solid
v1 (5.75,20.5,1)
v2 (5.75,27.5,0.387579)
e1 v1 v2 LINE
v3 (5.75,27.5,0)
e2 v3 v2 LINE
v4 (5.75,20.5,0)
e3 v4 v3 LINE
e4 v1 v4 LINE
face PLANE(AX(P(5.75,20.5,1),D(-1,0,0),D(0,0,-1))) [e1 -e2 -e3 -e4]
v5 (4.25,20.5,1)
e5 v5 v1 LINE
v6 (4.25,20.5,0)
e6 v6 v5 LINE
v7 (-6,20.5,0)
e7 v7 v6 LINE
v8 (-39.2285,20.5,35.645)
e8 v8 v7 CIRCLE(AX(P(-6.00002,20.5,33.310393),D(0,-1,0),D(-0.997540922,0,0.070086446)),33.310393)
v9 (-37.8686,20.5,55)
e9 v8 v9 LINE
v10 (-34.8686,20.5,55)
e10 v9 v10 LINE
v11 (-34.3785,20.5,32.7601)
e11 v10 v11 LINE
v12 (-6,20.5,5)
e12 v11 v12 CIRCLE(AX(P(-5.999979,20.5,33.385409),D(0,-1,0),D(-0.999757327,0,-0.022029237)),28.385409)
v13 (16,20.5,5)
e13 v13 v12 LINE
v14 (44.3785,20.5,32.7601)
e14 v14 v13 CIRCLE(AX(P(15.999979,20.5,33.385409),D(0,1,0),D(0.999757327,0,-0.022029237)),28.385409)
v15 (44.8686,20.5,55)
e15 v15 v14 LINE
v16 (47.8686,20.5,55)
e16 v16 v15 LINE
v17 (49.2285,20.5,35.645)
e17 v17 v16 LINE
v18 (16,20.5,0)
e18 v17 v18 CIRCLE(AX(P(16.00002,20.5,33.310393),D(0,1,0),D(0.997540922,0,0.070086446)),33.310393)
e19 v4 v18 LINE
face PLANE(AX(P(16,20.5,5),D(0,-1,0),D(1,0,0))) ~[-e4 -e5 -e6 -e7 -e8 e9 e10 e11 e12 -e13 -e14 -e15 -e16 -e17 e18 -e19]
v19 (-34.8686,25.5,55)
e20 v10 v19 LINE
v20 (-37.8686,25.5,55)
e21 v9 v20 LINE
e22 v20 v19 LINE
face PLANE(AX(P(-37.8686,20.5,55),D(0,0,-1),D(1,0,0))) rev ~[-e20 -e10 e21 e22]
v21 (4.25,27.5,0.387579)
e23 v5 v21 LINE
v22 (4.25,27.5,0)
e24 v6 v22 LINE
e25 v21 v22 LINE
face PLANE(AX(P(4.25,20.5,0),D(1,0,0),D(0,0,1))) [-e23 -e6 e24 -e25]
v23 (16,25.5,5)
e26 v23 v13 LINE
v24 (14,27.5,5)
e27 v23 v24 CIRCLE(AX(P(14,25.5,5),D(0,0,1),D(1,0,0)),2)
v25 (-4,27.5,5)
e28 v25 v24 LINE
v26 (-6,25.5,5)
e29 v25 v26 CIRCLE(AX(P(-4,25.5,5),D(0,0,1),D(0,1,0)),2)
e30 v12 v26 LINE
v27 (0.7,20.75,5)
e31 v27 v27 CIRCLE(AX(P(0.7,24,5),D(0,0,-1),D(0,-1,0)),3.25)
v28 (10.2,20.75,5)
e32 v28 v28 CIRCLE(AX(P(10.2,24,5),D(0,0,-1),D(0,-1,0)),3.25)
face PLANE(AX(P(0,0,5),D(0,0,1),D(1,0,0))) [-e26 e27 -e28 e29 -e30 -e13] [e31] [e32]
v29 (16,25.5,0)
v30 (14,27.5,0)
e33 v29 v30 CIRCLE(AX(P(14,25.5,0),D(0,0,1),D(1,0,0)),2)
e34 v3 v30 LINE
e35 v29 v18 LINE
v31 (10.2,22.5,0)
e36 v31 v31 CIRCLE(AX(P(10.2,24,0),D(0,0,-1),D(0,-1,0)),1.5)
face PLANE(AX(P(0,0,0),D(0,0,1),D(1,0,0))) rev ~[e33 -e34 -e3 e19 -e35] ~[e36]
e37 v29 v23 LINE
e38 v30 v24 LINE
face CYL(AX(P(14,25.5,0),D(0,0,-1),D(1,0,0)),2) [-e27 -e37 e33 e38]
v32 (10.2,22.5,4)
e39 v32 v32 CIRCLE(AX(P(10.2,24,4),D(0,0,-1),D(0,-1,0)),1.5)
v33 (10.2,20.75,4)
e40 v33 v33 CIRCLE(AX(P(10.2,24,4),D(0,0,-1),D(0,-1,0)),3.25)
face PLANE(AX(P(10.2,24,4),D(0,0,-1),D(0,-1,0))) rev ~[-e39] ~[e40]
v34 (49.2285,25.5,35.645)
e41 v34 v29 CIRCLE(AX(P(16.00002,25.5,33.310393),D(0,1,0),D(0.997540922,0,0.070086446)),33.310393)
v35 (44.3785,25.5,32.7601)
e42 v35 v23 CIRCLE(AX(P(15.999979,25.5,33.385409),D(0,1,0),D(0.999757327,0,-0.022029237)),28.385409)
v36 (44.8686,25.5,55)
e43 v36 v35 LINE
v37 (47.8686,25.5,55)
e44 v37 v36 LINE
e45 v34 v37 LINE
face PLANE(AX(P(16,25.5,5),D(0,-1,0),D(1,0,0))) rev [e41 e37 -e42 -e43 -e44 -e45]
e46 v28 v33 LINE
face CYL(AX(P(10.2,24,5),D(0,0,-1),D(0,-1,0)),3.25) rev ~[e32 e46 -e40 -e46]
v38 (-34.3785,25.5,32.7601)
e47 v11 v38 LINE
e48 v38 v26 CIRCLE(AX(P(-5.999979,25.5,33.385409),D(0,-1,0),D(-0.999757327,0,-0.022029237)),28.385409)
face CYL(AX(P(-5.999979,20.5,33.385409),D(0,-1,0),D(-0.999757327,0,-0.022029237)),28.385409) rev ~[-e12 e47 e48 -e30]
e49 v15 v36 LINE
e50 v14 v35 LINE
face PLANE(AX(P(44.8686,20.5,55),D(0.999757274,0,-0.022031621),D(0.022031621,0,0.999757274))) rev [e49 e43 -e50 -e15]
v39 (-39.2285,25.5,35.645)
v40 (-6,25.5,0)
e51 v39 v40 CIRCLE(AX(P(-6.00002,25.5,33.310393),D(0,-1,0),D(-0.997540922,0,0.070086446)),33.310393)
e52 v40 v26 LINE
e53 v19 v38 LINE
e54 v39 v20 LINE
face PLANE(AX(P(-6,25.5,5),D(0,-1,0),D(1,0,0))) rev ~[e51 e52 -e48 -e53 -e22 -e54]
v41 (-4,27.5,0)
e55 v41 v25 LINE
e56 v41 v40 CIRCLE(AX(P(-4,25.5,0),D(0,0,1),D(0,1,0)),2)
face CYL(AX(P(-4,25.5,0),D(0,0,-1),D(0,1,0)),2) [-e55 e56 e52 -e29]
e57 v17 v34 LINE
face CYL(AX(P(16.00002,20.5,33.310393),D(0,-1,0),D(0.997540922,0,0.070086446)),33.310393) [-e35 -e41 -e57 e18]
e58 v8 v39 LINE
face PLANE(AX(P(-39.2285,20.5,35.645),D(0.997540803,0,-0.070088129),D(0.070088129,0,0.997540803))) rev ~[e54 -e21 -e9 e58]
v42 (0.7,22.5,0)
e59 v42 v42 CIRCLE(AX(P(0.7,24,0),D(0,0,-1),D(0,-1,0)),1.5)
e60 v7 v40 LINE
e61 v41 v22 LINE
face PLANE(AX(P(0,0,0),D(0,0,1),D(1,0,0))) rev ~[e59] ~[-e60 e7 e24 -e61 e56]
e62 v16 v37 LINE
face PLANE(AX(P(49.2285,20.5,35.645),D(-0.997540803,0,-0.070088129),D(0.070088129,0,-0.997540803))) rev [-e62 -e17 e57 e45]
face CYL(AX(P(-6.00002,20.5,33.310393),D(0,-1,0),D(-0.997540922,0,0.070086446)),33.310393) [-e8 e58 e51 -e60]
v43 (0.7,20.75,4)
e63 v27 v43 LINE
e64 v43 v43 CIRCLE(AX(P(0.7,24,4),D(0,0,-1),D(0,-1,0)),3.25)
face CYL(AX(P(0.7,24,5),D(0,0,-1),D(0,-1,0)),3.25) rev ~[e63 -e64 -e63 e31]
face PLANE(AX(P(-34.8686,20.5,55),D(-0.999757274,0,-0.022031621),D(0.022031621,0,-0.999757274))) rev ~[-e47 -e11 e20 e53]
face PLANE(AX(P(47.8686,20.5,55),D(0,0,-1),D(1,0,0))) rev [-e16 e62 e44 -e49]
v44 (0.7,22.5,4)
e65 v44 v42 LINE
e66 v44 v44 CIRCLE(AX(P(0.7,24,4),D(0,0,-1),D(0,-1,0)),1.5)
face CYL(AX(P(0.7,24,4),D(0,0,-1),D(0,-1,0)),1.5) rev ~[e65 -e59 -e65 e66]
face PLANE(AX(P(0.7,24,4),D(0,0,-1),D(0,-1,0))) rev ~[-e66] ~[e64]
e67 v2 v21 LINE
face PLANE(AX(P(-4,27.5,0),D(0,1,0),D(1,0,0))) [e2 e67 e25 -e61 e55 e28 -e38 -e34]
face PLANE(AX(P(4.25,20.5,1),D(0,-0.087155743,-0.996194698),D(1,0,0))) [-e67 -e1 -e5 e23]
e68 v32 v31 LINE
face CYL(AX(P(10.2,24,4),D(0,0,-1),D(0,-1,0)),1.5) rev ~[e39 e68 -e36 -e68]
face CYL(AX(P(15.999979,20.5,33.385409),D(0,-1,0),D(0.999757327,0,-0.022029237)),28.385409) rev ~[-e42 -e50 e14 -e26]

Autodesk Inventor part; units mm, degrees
ref_plane "YZ Plane" through (0, 0, 0) normal (1, 0, 0) x (0, 1, 0)
ref_plane "XZ Plane" through (0, 0, 0) normal (0, 1, 0) x (-1, 0, 0)
ref_plane "XY Plane" through (0, 0, 0) normal (0, 0, 1) x (1, 0, 0)
ref_plane "Work Plane1" through (0, 0, 0) normal (0, 0, 1) x (1, 0, 0)
sketch "Sketch1" plane through (0, 0, 0) normal (0, 0, 1) x (1, 0, 0)
  circle A0 centre (10.2273, -23.9687) radius 0.75 projected
  circle A1 centre (0.7, 24) radius 0.75 projected
  circle A2 centre (10.2, 24) radius 0.75 projected
  circle A3 centre (0.7, -24) radius 0.75 projected
  arc A4 (-14, 7) -> (-16, 5) centre (-14, 5) ccw projected
  line L0 (-16, -15) -> (-16, 5) projected
  arc A5 (-16, -15) -> (-14, -17) centre (-14, -15) ccw projected
  line L1 (-8, -17) -> (-14, -17) projected
  arc A6 (-6, -19) -> (-8, -17) centre (-8, -19) ccw projected
  line L2 (-6, -25.5) -> (-6, -19) projected
  arc A7 (-6, -25.5) -> (-4, -27.5) centre (-4, -25.5) ccw projected
  line L3 (14, -27.5) -> (-4, -27.5) projected
  arc A8 (14, -27.5) -> (16, -25.5) centre (14, -25.5) ccw projected
  line L4 (16, -20.5) -> (16, -25.5) projected
  line L5 (-4, -20.5) -> (16, -20.5) projected
  line L6 (-4, -15) -> (-4, -20.5) projected
  line L7 (-14, -15) -> (-4, -15) projected
  line L8 (-14, 5) -> (-14, -15) projected
  line L9 (-4, 5) -> (-14, 5) projected
  line L10 (-4, 20.5) -> (-4, 5) projected
  line L11 (16, 20.5) -> (-4, 20.5) projected
  line L12 (16, 25.5) -> (16, 20.5) projected
  arc A9 (16, 25.5) -> (14, 27.5) centre (14, 25.5) ccw projected
  line L13 (-4, 27.5) -> (14, 27.5) projected
  arc A10 (-4, 27.5) -> (-6, 25.5) centre (-4, 25.5) ccw projected
  line L14 (-6, 9) -> (-6, 25.5) projected
  arc A11 (-8, 7) -> (-6, 9) centre (-8, 9) ccw projected
  line L15 (-14, 7) -> (-8, 7) projected
  line L16 (-4, 20.5) -> (-6, 20.5)
  point P0 (0, 0)
extrude "Extrusion1" add sketch "Sketch1" along normal blind 5 contours L14 A10 L13 A9 L12 L11 L16
sketch "Sketch2" plane through (0, 0, 5) normal (0, 0, 1) x (1, 0, 0)
  circle A0 centre (0.7, 24) radius 0.75 projected
  circle A1 centre (10.2, 24) radius 0.75 projected
  point P0 (0, 0)
hole "Hole1" at (0.7, 24, 5) at (10.2, 24, 5) direction (0, 0, -1) diameter 3 end through all counterbore diameter 6.5 counterbore depth 1
sketch "Sketch4" plane through (-6, 20.5, 0) normal (0, -1, 0) x (1, 0, 0)
  line L0 (0, 0) -> (22, 0) projected
  line L1 (11.75, -1) -> (10.25, -1) construction
  line L2 (10.25, -1) -> (10.25, 1) construction
  line L3 (10.25, 1) -> (11.75, 1) construction
  line L4 (11.75, 1) -> (11.75, -1) construction
  line L5 (11.75, -1) -> (10.25, 1) construction
  line L6 (10.25, -1) -> (11.75, 1) construction
  line L7 (10.25, 1) -> (11.75, 1)
  line L8 (11.75, 1) -> (11.75, 0)
  line L9 (11.75, 0) -> (10.25, 0)
  line L10 (10.25, 0) -> (10.25, 1)
  point P0 (6, 0)
  point P1 (11, 0)
  dimension "d9" = 1.5
  dimension "d10" = 2
extrude "Extrusion2" cut sketch "Sketch4" against normal through all
draft "FaceDraft1" angle 5 pull direction (0, -1, 0) faces at (5.25, 22.8333, 1) fixed edges at (5, 20.5, 1)
sketch "Sketch5" plane through (-6, 20.5, 5) normal (0, -1, 0) x (1, 0, 0)
  arc A0 (-33.2285, 30.645) -> (0, -5) centre (0, 28.3104) ccw
  line L0 (2, 0) -> (0, 0) projected
  arc A1 (-28.3785, 27.7601) -> (0, 0) centre (0, 28.3854) ccw
  line L1 (-33.2285, 30.645) -> (-31.8686, 50)
  line L2 (-31.8686, 50) -> (-28.8686, 50)
  line L3 (-28.8686, 50) -> (-28.3785, 27.7601)
  line L4 (0, 0) -> (22, 0) projected
  line L5 (0, -5) -> (10.25, -5) projected
  line L6 (0, -5) -> (0, 0) projected
  line L7 (0, -5) -> (0, 0)
  dimension "d15" = 50
  dimension "d16" = 3
ref_plane "Work Plane2" through (5, 20.5, 0) normal (1, 0, 0) x (0, 0, -1)
extrude "Extrusion3" add sketch "Sketch5" against normal blind 5
mirror "Mirror1" about plane through (5, 20.5, 0) normal (1, 0, 0) of "Extrusion3"
properties part number "leg"
